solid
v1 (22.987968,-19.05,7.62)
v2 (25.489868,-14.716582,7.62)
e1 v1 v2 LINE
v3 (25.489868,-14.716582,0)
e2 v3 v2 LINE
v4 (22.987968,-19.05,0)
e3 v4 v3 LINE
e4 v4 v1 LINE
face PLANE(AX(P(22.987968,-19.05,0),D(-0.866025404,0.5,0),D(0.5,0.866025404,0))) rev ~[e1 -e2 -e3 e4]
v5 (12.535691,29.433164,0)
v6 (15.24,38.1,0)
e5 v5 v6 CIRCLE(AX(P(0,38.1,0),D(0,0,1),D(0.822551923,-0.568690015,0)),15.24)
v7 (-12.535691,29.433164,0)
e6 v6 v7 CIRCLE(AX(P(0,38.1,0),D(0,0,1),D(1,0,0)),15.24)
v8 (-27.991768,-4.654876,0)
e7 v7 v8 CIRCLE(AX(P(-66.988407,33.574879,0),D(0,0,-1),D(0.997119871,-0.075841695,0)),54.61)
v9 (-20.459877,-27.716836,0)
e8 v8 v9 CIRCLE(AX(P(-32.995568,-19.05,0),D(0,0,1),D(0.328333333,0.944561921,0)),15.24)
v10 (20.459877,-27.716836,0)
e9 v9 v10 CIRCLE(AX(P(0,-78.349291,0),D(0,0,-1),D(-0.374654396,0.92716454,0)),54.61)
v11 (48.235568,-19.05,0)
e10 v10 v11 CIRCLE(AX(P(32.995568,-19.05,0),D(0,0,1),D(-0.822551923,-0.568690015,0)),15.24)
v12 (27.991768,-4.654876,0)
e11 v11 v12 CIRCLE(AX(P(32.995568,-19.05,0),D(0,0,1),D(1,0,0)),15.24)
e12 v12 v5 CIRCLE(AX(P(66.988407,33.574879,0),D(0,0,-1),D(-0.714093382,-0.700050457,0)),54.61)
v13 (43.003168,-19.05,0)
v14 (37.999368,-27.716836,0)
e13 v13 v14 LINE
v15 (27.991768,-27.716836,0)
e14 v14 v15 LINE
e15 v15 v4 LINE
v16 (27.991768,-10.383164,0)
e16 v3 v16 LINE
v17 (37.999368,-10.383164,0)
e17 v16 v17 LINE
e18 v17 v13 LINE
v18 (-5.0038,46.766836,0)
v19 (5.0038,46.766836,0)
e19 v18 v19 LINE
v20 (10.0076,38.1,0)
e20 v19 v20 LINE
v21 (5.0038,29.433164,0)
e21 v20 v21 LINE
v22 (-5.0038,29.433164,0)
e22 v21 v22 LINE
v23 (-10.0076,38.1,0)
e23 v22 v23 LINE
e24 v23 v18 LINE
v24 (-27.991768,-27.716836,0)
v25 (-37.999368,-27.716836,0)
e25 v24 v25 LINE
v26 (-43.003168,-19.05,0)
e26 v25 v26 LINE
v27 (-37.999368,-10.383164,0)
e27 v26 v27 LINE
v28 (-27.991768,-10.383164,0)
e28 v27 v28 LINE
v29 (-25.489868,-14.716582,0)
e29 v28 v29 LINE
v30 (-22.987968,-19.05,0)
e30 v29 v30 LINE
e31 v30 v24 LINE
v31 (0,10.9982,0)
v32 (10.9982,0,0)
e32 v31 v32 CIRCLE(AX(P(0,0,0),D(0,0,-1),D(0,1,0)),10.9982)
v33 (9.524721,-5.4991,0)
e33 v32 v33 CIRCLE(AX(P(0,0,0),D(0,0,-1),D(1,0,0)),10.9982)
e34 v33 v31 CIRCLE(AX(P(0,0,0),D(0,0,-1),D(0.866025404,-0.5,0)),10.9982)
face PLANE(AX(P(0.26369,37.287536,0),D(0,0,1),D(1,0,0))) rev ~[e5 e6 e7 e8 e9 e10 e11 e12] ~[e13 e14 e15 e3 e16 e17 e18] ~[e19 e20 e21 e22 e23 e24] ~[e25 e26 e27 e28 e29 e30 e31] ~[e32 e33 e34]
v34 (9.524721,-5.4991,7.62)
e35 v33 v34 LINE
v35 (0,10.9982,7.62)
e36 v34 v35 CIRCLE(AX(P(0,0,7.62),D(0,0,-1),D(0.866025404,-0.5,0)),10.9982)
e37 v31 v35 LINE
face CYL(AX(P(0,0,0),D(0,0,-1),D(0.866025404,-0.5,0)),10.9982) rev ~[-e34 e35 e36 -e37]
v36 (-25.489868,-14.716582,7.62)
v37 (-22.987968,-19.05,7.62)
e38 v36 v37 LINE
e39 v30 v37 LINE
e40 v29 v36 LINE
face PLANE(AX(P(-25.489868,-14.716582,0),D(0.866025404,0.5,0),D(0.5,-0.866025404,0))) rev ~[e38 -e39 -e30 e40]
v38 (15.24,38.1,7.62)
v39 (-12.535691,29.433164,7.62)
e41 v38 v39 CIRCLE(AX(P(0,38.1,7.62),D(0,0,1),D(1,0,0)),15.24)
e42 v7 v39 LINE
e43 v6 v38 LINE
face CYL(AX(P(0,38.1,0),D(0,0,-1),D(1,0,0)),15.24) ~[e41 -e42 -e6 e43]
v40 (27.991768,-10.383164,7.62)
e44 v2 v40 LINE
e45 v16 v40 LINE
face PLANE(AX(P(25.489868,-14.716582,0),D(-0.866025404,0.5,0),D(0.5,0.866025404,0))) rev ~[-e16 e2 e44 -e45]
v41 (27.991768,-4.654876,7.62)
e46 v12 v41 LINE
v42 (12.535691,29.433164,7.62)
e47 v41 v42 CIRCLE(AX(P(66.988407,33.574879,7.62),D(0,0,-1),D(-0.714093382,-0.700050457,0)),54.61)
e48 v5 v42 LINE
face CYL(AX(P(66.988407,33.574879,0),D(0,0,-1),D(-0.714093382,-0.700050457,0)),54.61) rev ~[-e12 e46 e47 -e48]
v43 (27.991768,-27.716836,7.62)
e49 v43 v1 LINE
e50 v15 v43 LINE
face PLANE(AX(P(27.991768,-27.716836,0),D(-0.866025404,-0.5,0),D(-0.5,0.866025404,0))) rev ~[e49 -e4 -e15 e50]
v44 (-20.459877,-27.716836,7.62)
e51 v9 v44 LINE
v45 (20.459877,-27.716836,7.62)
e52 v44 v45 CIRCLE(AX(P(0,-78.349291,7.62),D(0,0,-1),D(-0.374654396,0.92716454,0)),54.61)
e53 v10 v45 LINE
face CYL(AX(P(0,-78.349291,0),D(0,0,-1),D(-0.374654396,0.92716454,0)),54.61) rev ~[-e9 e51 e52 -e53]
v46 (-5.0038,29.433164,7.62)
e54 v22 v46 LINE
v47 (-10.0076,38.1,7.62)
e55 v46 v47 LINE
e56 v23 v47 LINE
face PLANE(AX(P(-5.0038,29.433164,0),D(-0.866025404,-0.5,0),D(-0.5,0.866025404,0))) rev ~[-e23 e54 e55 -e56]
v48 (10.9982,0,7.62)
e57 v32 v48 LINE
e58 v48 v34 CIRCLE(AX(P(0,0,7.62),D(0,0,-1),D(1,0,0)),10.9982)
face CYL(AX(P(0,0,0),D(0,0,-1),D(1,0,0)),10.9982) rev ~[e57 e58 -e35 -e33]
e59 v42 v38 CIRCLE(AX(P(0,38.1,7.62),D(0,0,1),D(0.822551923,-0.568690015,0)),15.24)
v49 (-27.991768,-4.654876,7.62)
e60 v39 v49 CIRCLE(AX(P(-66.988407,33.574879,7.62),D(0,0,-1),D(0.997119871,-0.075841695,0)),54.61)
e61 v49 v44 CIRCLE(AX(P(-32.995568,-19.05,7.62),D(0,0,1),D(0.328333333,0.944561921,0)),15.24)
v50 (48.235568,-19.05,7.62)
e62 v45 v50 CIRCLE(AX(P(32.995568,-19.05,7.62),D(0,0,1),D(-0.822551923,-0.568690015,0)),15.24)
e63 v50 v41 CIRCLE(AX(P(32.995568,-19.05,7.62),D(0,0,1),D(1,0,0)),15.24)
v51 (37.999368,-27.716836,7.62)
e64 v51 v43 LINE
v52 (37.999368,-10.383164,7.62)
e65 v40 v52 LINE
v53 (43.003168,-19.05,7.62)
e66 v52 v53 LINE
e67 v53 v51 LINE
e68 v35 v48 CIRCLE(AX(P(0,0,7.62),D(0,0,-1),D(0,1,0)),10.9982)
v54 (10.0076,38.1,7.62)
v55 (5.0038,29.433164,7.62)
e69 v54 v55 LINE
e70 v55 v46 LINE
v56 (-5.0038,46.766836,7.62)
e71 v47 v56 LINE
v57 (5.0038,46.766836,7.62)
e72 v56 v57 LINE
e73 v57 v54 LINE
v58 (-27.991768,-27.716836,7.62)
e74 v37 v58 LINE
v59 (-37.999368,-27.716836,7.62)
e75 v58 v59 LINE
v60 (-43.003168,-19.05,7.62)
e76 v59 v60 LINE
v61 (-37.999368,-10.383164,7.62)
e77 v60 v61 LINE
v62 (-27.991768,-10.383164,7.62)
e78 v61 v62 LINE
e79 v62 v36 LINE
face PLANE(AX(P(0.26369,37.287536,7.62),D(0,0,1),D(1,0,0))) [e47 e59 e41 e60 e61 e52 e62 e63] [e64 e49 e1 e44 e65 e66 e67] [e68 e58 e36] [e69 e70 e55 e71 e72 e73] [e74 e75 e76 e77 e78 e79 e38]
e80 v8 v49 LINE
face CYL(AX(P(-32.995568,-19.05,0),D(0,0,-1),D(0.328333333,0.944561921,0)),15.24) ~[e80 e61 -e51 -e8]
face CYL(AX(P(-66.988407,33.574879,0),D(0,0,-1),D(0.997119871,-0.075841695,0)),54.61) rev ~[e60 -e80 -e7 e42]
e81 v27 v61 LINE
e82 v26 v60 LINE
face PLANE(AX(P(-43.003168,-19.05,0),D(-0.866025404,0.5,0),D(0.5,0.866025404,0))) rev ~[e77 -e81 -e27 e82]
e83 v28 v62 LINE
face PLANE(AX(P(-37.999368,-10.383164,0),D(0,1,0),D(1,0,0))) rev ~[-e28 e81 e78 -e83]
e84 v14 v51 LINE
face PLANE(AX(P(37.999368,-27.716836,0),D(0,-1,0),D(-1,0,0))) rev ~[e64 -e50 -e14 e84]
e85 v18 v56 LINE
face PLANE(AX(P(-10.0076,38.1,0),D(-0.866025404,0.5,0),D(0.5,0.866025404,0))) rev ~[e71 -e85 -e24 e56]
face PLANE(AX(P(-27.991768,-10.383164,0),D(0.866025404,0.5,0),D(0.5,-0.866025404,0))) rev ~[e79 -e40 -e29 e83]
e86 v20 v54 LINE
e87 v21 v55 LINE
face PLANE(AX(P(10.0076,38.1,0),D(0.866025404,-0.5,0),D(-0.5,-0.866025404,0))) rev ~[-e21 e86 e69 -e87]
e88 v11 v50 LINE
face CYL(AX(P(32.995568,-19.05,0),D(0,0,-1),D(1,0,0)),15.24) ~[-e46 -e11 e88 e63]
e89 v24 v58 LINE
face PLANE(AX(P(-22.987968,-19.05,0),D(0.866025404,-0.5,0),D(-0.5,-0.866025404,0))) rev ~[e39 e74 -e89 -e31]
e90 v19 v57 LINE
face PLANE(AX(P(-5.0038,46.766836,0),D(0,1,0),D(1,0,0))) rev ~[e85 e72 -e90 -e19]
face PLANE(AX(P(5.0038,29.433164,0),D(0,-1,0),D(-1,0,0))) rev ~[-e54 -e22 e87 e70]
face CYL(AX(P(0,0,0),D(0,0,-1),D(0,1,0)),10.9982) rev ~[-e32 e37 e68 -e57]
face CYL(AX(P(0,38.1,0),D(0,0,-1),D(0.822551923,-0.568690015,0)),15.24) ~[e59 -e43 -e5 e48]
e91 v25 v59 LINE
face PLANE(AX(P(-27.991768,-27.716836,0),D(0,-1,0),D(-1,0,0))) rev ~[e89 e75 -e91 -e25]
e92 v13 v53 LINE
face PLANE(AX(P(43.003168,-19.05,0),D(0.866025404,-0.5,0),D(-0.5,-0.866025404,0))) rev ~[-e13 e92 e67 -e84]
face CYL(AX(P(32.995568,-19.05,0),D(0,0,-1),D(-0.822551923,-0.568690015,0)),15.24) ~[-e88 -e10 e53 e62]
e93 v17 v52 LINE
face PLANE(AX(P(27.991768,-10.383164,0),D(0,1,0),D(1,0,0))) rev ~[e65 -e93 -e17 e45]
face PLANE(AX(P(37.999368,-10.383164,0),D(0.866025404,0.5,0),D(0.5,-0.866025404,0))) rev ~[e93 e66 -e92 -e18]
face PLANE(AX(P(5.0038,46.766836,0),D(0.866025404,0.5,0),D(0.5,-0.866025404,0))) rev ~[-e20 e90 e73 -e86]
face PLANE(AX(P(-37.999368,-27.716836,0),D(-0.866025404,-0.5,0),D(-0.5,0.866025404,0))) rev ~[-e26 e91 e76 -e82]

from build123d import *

# Parameters (mm, degrees)
F1_DEPTH = 7.62


# Not quite as in the source:
# - a feature names something its author has since deleted; it is built from what else it names


with BuildPart() as f1:
    # F0 (on Top) → F1 (new body)
    with BuildSketch(Plane.XY):
        with BuildLine():
            ThreePointArc((-12.5356913124, 29.4331641691), (-7.0772530666, 24.60295999), (0, 22.86))
            ThreePointArc((0, 22.86), (7.0772530666, 24.60295999), (12.5356913124, 29.4331641691))
            ThreePointArc((12.5356913124, 29.4331641691), (14.5482221526, 33.5605251185), (15.24, 38.1))
            ThreePointArc((15.24, 38.1), (-4.5394748815, 52.6482221526), (-12.5356913124, 29.4331641691))
        make_face()
        Polygon((5.0038, 29.4331641691), (0, 29.4331641691), (-5.0038, 29.4331641691), (-10.0076, 38.1), (-5.0038, 46.7668358309), (5.0038, 46.7668358309), (10.0076, 38.1), align=None, mode=Mode.SUBTRACT)
        with BuildLine():
            ThreePointArc((27.9917678842, -4.654876327), (23.2845420207, -7.3046359495), (19.7973407305, -11.43))
            ThreePointArc((19.7973407305, -11.43), (17.7681618263, -19.6694390603), (20.4598765718, -27.7168358309))
            ThreePointArc((20.4598765718, -27.7168358309), (37.5350427657, -33.5982221526), (48.2355678842, -19.05))
            ThreePointArc((48.2355678842, -19.05), (41.8273199187, -6.6299454107), (27.9917678842, -4.654876327))
        make_face()
        Polygon((22.9879678842, -19.05), (25.4898678842, -14.7165820845), (27.9917678842, -10.3831641691), (37.9993678842, -10.3831641691), (43.0031678842, -19.05), (37.9993678842, -27.7168358309), (27.9917678842, -27.7168358309), align=None, mode=Mode.SUBTRACT)
        with BuildLine():
            ThreePointArc((-17.7555678842, -19.05), (-18.2748582915, -15.1055977526), (-19.7973407305, -11.43))
            ThreePointArc((-19.7973407305, -11.43), (-23.2845420207, -7.3046359495), (-27.9917678842, -4.654876327))
            ThreePointArc((-27.9917678842, -4.654876327), (-47.4825252222, -23.7813493938), (-20.4598765718, -27.7168358309))
            ThreePointArc((-20.4598765718, -27.7168358309), (-18.4473457316, -23.5894748815), (-17.7555678842, -19.05))
        make_face()
        Polygon((-27.9917678842, -10.3831641691), (-25.4898678842, -14.7165820845), (-22.9879678842, -19.05), (-27.9917678842, -27.7168358309), (-37.9993678842, -27.7168358309), (-43.0031678842, -19.05), (-37.9993678842, -10.3831641691), align=None, mode=Mode.SUBTRACT)
        with BuildLine():
            ThreePointArc((-9.5247205959, -5.4991), (-9.5247205959, 5.4991), (0, 10.9982))
            Line((0, 10.9982), (0, 22.86))
            ThreePointArc((0, 22.86), (-7.0772530666, 24.60295999), (-12.5356913124, 29.4331641691))
            ThreePointArc((-12.5356913124, 29.4331641691), (-17.2521616486, 11.0236496258), (-27.9917678842, -4.654876327))
            ThreePointArc((-27.9917678842, -4.654876327), (-23.2845420207, -7.3046359495), (-19.7973407305, -11.43))
            Line((-19.7973407305, -11.43), (-9.5247205959, -5.4991))
        make_face()
        with BuildLine():
            Line((0, 22.86), (0, 10.9982))
            ThreePointArc((0, 10.9982), (7.7769018008, 7.7769018008), (10.9982, 0))
            ThreePointArc((10.9982, 0), (10.6234454227, -2.8465436218), (9.5247205959, -5.4991))
            Line((9.5247205959, -5.4991), (19.7973407305, -11.43))
            ThreePointArc((19.7973407305, -11.43), (23.2845420207, -7.3046359495), (27.9917678842, -4.654876327))
            ThreePointArc((27.9917678842, -4.654876327), (17.2521616486, 11.0236496258), (12.5356913124, 29.4331641691))
            ThreePointArc((12.5356913124, 29.4331641691), (7.0772530666, 24.60295999), (0, 22.86))
        make_face()
        with BuildLine():
            ThreePointArc((9.5247205959, -5.4991), (0, -10.9982), (-9.5247205959, -5.4991))
            Line((-9.5247205959, -5.4991), (-19.7973407305, -11.43))
            ThreePointArc((-19.7973407305, -11.43), (-18.2748582915, -15.1055977526), (-17.7555678842, -19.05))
            ThreePointArc((-17.7555678842, -19.05), (-18.4473457316, -23.5894748815), (-20.4598765718, -27.7168358309))
            ThreePointArc((-20.4598765718, -27.7168358309), (0, -23.7392913379), (20.4598765718, -27.7168358309))
            ThreePointArc((20.4598765718, -27.7168358309), (17.7681618263, -19.6694390603), (19.7973407305, -11.43))
            Line((19.7973407305, -11.43), (9.5247205959, -5.4991))
        make_face()
    extrude(amount=F1_DEPTH)


solid = f1.part
